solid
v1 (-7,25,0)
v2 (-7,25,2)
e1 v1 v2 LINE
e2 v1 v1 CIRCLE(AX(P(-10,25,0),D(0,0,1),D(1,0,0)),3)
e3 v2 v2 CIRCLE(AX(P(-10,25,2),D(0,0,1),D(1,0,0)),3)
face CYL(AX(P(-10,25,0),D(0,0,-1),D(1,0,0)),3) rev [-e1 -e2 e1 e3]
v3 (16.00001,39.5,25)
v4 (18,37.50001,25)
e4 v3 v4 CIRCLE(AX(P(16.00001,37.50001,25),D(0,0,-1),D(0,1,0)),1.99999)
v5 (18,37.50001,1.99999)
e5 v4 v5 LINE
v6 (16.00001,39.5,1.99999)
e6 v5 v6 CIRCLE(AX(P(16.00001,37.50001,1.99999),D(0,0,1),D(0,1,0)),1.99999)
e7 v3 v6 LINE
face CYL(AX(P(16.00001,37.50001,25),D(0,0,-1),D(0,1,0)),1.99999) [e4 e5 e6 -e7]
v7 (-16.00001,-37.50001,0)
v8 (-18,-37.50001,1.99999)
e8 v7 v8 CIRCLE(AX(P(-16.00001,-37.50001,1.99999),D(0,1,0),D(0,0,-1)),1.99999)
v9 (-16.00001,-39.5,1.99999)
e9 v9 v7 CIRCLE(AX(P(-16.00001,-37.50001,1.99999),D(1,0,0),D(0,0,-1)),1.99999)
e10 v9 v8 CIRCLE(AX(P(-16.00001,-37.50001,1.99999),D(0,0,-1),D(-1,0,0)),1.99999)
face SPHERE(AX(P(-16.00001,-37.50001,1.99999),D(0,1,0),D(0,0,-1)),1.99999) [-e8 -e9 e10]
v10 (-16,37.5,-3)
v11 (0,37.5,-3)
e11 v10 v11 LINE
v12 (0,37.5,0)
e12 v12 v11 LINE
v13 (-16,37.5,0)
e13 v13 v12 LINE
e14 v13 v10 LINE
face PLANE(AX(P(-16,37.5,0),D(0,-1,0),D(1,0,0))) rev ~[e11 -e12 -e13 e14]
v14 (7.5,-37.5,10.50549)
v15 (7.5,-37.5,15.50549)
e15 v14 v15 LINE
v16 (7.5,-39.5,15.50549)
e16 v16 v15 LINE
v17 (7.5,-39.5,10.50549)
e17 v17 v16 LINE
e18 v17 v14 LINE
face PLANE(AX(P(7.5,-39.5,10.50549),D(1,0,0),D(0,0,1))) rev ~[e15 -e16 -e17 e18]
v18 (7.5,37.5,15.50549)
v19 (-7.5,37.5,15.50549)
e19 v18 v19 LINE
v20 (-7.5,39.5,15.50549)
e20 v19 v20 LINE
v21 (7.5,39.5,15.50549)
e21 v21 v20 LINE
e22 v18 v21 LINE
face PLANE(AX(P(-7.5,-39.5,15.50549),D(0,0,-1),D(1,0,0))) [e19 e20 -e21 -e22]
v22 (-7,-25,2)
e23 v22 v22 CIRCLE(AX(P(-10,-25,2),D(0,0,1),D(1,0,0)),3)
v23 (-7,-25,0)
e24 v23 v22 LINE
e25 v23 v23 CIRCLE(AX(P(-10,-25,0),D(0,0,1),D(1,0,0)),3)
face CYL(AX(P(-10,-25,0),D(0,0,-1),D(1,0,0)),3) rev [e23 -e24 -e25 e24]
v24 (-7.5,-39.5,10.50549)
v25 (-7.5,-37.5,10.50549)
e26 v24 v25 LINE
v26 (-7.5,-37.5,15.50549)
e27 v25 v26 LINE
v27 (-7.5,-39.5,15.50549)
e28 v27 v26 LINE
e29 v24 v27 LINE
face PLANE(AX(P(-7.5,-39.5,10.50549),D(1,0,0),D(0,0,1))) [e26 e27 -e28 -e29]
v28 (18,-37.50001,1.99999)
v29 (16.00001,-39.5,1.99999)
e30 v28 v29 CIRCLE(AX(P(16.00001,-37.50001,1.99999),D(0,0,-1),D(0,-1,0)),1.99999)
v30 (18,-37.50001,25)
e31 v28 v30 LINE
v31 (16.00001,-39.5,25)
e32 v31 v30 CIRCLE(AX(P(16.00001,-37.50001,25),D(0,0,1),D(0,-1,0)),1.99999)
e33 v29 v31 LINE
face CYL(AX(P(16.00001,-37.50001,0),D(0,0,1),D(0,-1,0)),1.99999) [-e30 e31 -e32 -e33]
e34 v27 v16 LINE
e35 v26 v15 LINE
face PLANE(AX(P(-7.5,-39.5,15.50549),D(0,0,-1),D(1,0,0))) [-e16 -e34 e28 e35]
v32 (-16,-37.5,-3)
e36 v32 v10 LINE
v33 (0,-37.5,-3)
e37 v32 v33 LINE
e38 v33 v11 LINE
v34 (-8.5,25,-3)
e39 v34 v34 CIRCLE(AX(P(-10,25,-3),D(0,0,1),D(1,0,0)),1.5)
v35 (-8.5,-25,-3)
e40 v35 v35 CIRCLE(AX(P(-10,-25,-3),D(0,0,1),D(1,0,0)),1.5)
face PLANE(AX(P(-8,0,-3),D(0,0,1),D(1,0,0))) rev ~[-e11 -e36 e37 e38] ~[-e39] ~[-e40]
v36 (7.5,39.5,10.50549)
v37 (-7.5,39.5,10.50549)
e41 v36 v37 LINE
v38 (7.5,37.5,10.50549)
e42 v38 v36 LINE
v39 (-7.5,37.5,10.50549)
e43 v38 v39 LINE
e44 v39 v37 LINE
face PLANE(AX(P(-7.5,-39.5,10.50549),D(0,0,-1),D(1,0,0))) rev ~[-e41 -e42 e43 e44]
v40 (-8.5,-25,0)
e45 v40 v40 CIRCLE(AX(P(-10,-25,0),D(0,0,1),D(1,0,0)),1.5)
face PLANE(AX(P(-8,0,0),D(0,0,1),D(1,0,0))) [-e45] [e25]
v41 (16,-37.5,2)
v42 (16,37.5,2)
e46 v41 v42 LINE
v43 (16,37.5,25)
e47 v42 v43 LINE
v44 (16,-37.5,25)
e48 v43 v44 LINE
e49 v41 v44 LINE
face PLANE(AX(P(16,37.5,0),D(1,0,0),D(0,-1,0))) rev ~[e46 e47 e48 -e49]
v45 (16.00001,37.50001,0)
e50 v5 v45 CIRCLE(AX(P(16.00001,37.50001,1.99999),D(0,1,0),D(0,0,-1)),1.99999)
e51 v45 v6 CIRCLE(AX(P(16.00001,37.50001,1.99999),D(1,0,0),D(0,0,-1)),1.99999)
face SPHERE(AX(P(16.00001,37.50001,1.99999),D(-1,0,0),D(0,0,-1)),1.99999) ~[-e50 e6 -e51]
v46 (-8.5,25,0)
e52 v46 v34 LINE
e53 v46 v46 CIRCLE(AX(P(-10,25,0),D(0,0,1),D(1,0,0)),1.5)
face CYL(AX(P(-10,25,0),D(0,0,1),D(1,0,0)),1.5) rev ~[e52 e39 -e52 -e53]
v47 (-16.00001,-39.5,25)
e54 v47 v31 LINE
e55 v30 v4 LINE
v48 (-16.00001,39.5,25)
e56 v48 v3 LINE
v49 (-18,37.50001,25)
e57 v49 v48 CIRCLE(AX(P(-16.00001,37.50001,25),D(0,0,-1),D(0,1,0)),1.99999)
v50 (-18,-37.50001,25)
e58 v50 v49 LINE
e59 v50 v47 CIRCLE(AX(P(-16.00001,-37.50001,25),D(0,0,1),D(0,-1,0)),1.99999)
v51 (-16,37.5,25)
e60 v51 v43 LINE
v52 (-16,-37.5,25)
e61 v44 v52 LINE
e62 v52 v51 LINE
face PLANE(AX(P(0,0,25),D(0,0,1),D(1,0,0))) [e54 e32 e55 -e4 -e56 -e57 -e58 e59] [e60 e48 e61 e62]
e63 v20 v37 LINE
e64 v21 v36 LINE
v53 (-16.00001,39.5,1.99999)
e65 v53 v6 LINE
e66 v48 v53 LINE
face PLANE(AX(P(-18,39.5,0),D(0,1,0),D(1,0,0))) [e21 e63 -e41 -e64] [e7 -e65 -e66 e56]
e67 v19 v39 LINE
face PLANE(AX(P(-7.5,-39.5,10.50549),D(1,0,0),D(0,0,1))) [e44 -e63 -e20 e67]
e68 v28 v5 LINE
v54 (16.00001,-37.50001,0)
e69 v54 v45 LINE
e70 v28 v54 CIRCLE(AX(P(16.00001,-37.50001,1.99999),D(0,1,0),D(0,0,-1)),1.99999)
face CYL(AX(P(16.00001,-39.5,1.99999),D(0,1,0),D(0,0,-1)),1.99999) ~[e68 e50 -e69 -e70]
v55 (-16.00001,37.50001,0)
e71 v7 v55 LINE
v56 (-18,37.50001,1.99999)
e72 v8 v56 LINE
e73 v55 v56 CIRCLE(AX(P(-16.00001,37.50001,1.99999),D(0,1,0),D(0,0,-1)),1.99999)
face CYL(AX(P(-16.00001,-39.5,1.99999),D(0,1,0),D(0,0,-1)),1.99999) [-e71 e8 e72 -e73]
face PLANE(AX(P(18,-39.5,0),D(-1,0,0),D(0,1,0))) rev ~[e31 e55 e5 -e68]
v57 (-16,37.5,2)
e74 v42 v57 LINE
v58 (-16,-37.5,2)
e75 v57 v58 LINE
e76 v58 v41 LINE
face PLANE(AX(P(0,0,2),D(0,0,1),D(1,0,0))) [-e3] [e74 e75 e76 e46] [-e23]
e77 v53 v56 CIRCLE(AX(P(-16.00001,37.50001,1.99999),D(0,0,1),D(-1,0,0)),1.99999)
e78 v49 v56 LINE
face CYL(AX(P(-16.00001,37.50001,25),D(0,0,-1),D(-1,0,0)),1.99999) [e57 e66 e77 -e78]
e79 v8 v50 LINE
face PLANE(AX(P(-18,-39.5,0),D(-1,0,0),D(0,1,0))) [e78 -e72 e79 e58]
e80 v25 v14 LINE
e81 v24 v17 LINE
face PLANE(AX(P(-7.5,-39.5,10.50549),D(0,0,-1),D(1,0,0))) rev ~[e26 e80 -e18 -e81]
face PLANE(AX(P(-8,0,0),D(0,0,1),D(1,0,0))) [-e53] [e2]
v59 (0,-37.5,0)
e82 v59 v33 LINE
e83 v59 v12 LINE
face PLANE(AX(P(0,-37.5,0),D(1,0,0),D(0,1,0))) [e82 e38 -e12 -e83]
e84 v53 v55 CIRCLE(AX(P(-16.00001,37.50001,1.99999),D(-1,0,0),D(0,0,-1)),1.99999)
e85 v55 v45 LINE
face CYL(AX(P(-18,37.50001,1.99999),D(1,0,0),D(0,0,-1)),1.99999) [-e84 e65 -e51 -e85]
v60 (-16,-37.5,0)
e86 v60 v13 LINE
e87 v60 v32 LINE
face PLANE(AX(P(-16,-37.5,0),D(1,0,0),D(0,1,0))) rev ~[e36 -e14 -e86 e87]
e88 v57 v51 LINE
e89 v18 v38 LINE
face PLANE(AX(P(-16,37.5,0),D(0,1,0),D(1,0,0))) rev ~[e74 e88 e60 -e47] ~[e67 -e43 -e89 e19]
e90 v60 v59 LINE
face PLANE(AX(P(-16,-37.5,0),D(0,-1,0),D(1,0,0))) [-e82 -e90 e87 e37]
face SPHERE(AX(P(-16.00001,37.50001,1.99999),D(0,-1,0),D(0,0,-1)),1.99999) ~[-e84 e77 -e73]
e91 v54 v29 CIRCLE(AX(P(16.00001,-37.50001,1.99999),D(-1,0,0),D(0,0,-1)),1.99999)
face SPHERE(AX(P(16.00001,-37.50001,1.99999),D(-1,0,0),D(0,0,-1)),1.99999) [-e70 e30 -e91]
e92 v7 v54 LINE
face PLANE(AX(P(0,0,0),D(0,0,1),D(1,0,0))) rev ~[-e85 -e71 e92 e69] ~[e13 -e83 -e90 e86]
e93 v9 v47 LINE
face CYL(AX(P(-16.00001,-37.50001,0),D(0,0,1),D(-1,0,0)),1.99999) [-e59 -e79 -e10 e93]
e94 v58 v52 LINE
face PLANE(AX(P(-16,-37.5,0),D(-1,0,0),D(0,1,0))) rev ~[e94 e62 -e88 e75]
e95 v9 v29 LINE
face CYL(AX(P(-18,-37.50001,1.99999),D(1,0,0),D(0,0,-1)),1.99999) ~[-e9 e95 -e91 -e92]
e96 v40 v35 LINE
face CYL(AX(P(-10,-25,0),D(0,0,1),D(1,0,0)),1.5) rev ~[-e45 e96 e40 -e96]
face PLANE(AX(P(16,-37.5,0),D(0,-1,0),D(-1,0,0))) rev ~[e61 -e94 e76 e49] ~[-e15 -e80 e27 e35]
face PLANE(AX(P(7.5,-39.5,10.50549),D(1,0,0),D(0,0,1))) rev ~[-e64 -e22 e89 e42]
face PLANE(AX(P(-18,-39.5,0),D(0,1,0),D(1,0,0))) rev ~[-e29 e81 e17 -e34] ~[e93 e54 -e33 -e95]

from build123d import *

# Parameters (mm, degrees)
F0_W     = 36
F0_H     = 79
F0_W_2   = 16
F0_H_2   = 75
F0_R     = 3
F1_DEPTH = 2
F2_DEPTH = 25
F0_R_2   = 1.5
F3_DEPTH = 3
F4_R     = 1.99999
F5_W     = 15
F5_H     = 5
F6_DEPTH = 100


# Not quite as in the source:
# - a fillet or chamfer is up to 0.001 mm smaller than in the source, because OpenCascade refuses the exact size


with BuildPart() as f1:
    # F0 (on Top) → F1 (new body)
    with BuildSketch(Plane.XY):
        Rectangle(F0_W, F0_H)
        Polygon((0, 37.5), (16, 37.5), (16, -37.5), (0, -37.5), (-16, -37.5), (-16, 37.5), align=None, mode=Mode.SUBTRACT)
        with Locations((8, 0)):
            Rectangle(F0_W_2, F0_H_2)
        with Locations((-8, 0)):
            Rectangle(F0_W_2, F0_H_2)
        with Locations((-10, -25)):
            Circle(F0_R, mode=Mode.SUBTRACT)
        with Locations((-10, 25)):
            Circle(F0_R, mode=Mode.SUBTRACT)
    extrude(amount=F1_DEPTH)

    # F0 (on Top) → F2 (join)
    with BuildSketch(Plane.XY):
        Rectangle(F0_W, F0_H)
        Polygon((0, 37.5), (16, 37.5), (16, -37.5), (0, -37.5), (-16, -37.5), (-16, 37.5), align=None, mode=Mode.SUBTRACT)
    extrude(amount=F2_DEPTH)

    # F0 (on Top) → F3 (join)
    with BuildSketch(Plane.XY):
        with Locations((-8, 0)):
            Rectangle(F0_W_2, F0_H_2)
        with Locations((-10, -25)):
            Circle(F0_R, mode=Mode.SUBTRACT)
        with Locations((-10, 25)):
            Circle(F0_R, mode=Mode.SUBTRACT)
        with Locations((-10, 25)):
            Circle(F0_R)
        with Locations((-10, 25)):
            Circle(F0_R_2, mode=Mode.SUBTRACT)
        with Locations((-10, -25)):
            Circle(F0_R)
        with Locations((-10, -25)):
            Circle(F0_R_2, mode=Mode.SUBTRACT)
    extrude(amount=-F3_DEPTH)

    # F4 (radius 2 in the source; OpenCascade refuses exactly that, so slightly less here)
    f4_edges = [f1.edges().sort_by_distance(p)[0] for p in [
        (-18, 0, 0),
        (0, -39.5, 0),
        (0, 39.5, 0),
        (18, 0, 0),
        (18, 39.5, 12.5),
        (-18, 39.5, 12.5),
        (-18, -39.5, 12.5),
        (18, -39.5, 12.5),
    ]]
    fillet(f4_edges, radius=F4_R)

    # F5 (on face) → F6 (cut)
    with BuildSketch(Plane.XZ.offset(39.5)):
        with Locations((0, 13.0054904148)):
            Rectangle(F5_W, F5_H)
    extrude(amount=-F6_DEPTH, mode=Mode.SUBTRACT)


solid = f1.part
